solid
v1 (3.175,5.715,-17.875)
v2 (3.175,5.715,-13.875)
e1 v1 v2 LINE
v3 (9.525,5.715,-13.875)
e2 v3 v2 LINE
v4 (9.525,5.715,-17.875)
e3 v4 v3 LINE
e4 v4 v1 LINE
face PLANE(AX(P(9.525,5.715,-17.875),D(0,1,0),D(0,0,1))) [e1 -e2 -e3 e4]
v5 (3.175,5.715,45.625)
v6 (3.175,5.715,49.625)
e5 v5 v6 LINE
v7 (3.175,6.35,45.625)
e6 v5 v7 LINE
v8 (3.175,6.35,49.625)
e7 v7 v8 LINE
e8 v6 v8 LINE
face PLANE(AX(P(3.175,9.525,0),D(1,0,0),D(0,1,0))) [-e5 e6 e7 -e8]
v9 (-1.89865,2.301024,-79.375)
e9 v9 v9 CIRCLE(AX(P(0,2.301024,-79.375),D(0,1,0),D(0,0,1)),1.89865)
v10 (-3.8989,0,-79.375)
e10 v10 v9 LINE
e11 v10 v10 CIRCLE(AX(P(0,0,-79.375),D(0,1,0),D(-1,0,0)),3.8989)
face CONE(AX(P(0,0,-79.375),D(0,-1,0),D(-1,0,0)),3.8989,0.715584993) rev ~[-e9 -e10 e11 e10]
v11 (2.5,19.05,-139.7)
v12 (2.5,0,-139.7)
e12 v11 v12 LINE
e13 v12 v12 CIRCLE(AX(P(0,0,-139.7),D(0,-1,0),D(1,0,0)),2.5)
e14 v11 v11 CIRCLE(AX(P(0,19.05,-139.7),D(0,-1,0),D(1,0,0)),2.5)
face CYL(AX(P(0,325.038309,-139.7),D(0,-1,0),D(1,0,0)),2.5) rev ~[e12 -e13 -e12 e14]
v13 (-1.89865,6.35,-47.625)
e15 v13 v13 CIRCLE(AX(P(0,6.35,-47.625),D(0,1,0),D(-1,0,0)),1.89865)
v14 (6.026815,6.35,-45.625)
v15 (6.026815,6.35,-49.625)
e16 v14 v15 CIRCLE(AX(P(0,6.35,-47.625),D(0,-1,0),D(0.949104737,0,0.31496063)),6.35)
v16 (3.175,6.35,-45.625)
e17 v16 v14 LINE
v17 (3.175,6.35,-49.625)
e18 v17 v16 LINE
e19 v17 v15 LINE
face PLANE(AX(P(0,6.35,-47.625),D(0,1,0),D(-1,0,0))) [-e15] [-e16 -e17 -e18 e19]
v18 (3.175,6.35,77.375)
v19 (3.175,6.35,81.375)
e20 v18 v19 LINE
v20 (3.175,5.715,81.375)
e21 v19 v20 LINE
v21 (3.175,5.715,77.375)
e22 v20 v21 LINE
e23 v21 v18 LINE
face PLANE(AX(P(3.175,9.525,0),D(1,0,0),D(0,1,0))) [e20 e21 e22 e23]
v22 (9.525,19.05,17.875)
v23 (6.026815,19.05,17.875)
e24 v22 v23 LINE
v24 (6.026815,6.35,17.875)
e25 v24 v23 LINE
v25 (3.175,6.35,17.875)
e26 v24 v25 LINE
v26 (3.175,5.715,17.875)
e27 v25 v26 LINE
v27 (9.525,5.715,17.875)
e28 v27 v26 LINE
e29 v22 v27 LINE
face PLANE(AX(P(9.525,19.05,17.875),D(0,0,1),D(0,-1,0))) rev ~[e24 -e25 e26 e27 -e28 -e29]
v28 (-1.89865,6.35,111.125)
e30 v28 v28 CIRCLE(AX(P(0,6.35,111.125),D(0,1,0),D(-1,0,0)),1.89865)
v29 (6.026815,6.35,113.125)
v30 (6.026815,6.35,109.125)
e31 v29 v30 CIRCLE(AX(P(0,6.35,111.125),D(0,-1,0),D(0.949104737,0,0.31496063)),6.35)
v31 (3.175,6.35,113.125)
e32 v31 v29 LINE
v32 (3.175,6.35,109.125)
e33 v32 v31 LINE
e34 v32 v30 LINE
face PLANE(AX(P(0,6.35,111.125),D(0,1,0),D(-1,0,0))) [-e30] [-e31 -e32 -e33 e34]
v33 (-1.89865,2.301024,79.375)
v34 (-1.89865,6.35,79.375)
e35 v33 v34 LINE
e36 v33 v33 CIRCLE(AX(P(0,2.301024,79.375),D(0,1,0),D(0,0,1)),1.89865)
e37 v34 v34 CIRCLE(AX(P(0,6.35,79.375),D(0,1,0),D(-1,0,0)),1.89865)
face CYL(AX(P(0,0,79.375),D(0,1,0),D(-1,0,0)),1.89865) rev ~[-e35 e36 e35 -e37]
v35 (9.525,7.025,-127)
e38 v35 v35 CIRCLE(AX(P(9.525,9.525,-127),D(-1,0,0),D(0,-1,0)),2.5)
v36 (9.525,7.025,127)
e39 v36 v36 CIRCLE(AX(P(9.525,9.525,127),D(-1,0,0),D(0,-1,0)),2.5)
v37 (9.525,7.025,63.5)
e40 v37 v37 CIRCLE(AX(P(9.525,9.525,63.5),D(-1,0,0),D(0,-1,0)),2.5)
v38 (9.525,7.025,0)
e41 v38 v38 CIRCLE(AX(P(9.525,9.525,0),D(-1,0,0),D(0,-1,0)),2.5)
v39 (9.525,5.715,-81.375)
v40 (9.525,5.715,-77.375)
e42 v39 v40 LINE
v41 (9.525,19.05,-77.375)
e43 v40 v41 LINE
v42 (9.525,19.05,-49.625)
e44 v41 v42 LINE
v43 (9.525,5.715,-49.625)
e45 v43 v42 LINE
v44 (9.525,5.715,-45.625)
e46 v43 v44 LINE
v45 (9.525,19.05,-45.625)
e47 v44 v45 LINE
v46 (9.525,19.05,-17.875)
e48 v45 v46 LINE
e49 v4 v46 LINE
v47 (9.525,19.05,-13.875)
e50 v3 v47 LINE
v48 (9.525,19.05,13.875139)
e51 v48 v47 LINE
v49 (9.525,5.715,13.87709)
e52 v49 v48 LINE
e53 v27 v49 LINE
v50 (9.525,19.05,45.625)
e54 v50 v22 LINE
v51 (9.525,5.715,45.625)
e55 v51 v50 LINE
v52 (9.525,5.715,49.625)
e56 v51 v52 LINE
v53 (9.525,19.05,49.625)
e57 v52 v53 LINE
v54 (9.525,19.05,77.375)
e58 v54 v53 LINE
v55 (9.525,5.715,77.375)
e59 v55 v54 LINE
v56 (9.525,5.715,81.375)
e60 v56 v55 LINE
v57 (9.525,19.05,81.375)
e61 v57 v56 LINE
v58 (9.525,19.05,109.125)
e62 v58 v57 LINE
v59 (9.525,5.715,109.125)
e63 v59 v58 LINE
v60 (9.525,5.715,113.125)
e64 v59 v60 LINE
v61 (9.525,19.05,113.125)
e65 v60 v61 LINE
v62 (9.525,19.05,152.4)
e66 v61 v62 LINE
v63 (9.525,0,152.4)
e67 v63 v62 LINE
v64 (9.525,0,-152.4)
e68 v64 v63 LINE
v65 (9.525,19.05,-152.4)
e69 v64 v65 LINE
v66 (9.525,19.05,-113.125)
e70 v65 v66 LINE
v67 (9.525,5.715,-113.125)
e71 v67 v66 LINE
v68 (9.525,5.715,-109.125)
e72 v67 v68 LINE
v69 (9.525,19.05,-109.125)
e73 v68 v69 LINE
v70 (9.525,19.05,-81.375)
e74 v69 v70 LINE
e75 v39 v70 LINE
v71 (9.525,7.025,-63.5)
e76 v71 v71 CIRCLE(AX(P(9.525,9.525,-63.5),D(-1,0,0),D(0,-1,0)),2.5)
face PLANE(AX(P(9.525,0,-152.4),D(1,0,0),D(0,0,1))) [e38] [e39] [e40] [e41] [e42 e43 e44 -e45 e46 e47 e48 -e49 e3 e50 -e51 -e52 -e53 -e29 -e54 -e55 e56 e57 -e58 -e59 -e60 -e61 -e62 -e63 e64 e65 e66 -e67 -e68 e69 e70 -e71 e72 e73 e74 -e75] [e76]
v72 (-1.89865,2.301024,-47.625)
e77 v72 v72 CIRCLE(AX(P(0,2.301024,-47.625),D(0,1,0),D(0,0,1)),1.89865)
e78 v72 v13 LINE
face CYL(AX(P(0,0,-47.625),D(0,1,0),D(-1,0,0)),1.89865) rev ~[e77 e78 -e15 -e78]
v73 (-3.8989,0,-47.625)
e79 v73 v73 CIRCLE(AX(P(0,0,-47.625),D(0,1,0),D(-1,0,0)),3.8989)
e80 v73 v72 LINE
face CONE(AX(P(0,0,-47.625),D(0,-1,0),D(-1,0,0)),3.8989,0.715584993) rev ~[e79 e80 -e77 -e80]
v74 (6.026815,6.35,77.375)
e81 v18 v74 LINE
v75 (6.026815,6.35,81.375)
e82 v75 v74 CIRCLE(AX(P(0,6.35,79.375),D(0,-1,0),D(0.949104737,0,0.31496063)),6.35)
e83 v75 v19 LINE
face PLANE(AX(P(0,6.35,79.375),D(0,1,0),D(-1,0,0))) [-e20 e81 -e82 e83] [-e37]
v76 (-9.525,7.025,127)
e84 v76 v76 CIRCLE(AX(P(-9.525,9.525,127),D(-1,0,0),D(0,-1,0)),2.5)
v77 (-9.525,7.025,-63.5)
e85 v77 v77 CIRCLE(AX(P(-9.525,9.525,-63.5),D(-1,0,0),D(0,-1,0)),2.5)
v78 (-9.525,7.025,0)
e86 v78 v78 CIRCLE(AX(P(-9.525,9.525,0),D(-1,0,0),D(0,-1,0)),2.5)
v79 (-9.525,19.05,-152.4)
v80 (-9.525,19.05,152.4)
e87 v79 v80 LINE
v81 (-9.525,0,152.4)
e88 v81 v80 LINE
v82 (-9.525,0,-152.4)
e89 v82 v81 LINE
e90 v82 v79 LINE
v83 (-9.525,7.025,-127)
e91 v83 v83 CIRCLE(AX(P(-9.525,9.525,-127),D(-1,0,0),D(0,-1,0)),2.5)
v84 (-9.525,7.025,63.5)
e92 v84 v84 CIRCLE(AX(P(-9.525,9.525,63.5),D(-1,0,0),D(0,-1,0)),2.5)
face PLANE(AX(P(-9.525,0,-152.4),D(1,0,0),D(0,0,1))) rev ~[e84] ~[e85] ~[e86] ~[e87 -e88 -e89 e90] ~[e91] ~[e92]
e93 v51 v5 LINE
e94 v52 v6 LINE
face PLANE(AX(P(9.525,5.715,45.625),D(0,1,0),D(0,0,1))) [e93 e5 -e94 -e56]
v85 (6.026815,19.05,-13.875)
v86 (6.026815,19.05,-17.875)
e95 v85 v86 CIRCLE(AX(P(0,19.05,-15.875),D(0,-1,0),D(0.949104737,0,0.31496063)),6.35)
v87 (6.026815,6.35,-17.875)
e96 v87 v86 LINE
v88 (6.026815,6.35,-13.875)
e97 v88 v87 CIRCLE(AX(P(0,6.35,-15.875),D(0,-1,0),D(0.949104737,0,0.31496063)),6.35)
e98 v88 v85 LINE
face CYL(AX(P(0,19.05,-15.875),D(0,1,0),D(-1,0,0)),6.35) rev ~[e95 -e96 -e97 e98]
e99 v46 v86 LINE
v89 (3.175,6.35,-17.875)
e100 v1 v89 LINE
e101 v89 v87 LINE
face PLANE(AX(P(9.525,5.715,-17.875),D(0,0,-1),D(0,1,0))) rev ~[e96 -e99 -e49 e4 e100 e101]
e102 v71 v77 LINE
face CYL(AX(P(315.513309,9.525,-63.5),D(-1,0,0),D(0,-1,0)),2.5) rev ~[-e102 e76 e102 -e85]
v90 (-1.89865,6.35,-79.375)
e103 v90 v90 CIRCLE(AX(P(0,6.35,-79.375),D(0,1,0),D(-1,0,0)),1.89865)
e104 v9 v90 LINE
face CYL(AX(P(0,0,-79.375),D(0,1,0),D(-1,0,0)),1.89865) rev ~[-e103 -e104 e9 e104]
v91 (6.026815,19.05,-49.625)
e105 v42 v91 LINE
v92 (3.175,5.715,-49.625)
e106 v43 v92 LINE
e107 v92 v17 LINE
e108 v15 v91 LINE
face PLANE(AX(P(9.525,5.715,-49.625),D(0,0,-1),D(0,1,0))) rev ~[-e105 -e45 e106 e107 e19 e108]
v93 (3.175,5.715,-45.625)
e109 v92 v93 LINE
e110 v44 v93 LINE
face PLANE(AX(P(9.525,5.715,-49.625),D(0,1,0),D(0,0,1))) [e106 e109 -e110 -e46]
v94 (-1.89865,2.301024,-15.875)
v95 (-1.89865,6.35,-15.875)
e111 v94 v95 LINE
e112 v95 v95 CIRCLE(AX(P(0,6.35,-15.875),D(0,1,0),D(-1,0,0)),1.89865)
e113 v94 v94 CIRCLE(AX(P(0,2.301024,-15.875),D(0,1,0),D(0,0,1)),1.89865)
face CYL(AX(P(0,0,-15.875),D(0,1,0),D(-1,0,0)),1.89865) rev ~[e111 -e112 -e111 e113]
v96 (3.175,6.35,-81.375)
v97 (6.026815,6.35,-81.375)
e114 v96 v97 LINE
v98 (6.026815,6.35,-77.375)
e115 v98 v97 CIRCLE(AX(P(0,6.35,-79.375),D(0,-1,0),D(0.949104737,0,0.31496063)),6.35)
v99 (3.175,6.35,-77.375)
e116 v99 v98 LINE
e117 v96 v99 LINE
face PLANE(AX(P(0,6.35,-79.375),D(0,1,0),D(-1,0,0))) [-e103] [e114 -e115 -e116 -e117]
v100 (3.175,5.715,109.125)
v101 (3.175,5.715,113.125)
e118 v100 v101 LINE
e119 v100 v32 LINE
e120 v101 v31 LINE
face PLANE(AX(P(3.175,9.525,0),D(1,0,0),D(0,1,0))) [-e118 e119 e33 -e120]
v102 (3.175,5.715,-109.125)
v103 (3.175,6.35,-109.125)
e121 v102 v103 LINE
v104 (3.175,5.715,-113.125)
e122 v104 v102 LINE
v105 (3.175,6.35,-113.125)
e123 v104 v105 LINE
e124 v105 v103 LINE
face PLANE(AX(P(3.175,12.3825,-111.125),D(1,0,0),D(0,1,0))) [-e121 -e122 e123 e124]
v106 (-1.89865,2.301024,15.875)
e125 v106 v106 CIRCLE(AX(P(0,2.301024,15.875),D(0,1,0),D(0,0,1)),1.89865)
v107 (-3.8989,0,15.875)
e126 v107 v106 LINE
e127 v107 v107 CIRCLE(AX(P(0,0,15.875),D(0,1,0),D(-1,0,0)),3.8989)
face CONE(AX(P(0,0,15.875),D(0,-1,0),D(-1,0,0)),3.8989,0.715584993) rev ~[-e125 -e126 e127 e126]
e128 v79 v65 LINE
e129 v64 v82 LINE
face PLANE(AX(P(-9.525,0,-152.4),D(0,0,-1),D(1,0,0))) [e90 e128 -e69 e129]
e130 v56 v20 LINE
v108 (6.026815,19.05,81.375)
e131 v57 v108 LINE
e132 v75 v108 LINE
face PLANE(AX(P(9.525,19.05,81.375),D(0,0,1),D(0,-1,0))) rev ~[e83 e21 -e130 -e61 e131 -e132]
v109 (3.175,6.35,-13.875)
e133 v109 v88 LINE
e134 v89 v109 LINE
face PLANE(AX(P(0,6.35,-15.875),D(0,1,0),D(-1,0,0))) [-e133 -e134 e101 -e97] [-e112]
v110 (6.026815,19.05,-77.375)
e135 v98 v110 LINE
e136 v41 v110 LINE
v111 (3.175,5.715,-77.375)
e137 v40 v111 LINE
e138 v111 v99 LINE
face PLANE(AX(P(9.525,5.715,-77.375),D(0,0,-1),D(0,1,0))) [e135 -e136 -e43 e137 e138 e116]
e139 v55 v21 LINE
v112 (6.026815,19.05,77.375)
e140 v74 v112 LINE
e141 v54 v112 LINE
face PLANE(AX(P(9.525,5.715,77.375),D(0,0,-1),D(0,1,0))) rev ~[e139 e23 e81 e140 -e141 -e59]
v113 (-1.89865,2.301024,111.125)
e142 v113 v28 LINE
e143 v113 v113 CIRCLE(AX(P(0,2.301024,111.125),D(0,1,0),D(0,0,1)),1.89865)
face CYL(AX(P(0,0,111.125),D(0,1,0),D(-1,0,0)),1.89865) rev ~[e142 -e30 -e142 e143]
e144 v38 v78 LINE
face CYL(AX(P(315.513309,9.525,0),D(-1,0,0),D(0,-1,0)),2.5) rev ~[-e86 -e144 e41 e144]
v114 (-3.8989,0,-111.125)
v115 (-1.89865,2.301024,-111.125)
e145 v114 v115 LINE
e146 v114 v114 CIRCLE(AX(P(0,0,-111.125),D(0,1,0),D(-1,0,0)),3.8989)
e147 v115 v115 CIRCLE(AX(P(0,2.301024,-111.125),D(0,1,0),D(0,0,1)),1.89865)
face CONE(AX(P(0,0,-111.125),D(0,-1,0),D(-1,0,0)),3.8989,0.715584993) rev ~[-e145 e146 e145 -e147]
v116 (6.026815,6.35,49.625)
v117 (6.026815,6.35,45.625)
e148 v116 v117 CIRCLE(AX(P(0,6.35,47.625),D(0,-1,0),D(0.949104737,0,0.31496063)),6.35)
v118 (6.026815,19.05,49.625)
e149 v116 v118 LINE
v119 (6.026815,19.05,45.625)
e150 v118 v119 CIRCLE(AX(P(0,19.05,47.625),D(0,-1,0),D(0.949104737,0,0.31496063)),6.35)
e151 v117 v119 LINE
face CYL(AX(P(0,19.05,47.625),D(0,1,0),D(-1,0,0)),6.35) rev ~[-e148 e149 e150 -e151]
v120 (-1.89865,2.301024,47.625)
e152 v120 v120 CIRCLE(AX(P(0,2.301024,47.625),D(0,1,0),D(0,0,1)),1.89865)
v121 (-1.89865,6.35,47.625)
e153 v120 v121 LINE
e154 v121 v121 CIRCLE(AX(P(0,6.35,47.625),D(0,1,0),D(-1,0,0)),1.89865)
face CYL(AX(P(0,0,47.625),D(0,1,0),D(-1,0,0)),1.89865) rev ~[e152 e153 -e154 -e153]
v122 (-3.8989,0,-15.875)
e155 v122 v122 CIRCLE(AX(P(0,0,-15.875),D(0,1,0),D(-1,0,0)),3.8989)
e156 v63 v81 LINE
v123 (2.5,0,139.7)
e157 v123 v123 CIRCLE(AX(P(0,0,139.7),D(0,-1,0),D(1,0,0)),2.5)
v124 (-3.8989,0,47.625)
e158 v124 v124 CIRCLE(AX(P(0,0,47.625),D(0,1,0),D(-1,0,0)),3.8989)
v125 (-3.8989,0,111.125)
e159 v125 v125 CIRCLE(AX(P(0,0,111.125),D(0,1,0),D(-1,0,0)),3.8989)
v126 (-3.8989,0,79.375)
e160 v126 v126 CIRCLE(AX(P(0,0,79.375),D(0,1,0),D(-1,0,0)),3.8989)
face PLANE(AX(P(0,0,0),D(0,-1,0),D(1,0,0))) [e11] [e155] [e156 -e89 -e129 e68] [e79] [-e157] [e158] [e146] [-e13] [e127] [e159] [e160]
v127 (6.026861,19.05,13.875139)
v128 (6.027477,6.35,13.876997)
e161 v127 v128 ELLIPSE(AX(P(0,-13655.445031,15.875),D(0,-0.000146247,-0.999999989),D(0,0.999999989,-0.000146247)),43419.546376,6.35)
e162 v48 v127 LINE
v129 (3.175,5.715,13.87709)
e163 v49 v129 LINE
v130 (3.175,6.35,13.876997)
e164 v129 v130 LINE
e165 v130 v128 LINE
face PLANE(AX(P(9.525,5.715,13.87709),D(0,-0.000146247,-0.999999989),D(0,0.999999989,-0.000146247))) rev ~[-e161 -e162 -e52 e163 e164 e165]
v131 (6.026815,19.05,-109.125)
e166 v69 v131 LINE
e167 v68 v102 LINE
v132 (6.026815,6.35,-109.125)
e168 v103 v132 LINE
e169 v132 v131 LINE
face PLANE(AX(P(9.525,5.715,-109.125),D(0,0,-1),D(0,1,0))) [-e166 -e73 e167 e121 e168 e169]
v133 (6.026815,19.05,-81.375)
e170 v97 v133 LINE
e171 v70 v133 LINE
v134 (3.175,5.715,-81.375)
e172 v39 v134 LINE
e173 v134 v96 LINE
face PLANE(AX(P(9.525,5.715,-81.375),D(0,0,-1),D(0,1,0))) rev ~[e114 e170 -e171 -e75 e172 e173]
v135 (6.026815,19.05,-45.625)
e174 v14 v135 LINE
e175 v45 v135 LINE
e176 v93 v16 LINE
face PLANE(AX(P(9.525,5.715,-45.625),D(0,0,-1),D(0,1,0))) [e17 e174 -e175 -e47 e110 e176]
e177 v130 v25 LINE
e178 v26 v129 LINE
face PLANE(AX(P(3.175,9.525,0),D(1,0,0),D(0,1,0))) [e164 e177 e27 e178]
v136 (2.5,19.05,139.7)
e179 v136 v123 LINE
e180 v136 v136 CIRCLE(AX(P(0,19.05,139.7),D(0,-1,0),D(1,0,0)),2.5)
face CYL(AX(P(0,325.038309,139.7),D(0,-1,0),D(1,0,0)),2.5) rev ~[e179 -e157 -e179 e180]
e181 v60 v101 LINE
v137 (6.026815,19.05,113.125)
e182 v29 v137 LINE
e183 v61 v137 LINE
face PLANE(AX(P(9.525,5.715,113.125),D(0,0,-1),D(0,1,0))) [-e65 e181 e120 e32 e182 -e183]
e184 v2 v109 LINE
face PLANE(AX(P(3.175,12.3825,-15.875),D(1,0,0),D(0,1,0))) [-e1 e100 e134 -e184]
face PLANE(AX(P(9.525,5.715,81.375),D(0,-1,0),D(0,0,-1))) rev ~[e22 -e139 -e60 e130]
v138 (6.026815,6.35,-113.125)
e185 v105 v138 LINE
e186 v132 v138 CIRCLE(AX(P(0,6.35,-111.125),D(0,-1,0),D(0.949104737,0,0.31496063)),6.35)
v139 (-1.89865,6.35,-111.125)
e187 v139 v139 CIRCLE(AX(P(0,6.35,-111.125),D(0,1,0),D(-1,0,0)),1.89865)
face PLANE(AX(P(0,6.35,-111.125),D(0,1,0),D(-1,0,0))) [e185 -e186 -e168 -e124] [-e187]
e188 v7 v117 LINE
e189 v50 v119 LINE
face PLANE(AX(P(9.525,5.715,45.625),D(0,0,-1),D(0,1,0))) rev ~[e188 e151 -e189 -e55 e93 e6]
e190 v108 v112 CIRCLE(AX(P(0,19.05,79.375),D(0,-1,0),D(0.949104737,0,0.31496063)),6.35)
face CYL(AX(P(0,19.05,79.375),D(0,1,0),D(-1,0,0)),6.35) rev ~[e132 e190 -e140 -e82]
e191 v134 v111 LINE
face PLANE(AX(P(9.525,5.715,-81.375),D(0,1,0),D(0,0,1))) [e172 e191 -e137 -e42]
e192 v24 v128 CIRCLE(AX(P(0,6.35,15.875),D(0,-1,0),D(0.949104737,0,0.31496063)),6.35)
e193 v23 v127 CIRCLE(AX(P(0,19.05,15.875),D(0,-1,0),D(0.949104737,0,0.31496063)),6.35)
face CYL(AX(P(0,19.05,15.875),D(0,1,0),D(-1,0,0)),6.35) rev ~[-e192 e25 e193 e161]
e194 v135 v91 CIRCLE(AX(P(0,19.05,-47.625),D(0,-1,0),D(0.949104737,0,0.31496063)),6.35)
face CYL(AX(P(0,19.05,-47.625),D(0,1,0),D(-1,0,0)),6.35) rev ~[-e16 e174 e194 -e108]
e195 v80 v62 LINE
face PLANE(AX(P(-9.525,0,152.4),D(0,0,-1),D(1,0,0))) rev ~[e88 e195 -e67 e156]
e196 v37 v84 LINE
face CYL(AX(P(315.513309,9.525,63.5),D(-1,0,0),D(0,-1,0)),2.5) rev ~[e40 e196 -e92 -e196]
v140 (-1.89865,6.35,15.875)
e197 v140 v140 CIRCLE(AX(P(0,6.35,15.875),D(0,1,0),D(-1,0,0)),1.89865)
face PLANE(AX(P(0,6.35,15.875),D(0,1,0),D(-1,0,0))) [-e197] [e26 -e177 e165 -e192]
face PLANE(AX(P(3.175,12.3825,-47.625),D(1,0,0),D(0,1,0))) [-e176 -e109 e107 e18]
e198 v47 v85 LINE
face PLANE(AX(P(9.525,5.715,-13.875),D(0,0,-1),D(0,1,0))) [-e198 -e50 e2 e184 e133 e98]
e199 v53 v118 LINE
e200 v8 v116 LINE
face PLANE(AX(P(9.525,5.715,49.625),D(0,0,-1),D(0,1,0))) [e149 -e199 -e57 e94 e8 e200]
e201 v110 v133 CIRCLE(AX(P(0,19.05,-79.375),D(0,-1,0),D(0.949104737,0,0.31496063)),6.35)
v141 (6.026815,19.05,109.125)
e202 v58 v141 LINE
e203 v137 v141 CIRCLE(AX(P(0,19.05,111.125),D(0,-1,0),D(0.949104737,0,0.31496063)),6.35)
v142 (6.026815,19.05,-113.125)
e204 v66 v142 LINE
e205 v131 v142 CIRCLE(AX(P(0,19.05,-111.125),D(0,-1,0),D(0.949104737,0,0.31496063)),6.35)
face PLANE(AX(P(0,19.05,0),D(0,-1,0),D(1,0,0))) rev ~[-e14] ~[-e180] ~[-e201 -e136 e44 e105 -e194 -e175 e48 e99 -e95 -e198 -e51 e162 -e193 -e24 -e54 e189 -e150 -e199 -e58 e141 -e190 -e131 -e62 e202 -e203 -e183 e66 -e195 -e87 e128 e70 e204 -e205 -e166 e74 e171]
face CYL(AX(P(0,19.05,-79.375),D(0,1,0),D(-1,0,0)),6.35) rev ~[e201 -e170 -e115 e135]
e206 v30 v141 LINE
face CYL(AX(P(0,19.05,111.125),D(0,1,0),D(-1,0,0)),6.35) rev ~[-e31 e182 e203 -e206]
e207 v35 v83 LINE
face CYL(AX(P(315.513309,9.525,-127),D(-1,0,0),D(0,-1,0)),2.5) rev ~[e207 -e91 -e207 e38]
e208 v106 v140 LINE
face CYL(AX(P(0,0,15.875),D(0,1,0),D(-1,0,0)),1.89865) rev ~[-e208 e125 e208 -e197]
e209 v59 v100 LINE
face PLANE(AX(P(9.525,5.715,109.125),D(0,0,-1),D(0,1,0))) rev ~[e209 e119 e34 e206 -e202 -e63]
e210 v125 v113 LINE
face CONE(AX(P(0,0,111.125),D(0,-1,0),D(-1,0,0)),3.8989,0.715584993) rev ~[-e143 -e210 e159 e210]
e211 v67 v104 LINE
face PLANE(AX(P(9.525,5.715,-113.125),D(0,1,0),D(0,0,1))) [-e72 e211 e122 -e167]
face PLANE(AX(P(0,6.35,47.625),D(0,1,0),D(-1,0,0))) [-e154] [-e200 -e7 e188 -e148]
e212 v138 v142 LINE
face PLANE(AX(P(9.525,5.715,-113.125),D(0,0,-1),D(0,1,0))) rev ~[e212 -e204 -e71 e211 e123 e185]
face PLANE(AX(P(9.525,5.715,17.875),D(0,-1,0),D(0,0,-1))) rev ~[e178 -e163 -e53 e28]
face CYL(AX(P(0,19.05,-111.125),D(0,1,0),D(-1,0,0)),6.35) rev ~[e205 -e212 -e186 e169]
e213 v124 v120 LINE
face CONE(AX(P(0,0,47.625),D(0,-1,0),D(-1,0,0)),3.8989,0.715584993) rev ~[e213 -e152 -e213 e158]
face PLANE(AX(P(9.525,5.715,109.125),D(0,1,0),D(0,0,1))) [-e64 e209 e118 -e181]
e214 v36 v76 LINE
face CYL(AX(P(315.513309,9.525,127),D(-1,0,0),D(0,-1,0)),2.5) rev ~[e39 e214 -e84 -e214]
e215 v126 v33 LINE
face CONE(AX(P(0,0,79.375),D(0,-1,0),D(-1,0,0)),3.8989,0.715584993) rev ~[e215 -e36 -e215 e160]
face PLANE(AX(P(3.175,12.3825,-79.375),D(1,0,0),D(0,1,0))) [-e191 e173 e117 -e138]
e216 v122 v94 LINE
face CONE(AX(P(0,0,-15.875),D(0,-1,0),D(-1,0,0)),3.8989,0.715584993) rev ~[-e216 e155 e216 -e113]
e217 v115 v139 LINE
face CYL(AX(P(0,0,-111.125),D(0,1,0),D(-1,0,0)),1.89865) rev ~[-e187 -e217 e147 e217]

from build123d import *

# Parameters (mm, degrees)
F0_W           = 19.05
F0_H           = 304.8
F1_DEPTH       = 19.05
F3_D           = 5
F5_D           = 3.7973
F5_DEPTH       = 12.7
F5_CSINK_D     = 7.7978
F5_CSINK_ANGLE = 82
F5_TIP         = 1.1408240143
F6_W           = 31.75
F6_H           = 317.5
F6_W_2         = 23.05
F6_H_2         = 308.8
F6_W_3         = 13.335
F6_H_3         = 4
F6_W_4         = 0.9525
F7_DEPTH       = 6.35
F4_R           = 6.35
F8_DEPTH       = 12.7
F10_D          = 5


with BuildPart() as f1:
    # F0 (on Front) → F1 (new body)
    with BuildSketch(Plane.XZ):
        Rectangle(F0_W, F0_H)
    extrude(amount=-F1_DEPTH)

    # F3 (through all)
    with Locations(Plane.YZ.offset(9.525)):
        with Locations((9.525, 127), (9.525, 63.5), (9.525, 0), (9.525, -63.5), (9.525, -127)):
            Hole(F3_D / 2)

    # F5
    with Locations(Plane.XZ):
        with Locations((0, 111.125), (0, 79.375), (0, 47.625), (0, 15.875), (0, -15.875), (0, -47.625), (0, -79.375), (0, -111.125)):
            CounterSinkHole(F5_D / 2, F5_CSINK_D / 2, depth=F5_DEPTH, counter_sink_angle=F5_CSINK_ANGLE)
            with Locations((0, 0, -(F5_DEPTH + F5_TIP / 2))):  # 118° drill point
                Cone(0, F5_D / 2, F5_TIP, mode=Mode.SUBTRACT)

    # F6 (on face) → F7 (cut)
    with BuildSketch(Plane.YZ.offset(9.525)):
        with Locations((9.525, 0)):
            Rectangle(F6_W, F6_H)
        with Locations((9.525, 0)):
            Rectangle(F6_W_2, F6_H_2, mode=Mode.SUBTRACT)
        with Locations((9.525, 0)):
            Rectangle(F6_W_2, F6_H_2)
        Polygon((20.0025, 13.875), (19.05, 13.875), (19.05, -13.875), (20.0025, -13.875), (20.0025, -17.875), (19.05, -17.875), (19.05, -45.625), (20.0025, -45.625), (20.0025, -49.625), (19.05, -49.625), (19.05, -77.375), (20.0025, -77.375), (20.0025, -81.375), (19.05, -81.375), (19.05, -109.125), (20.0025, -109.125), (20.0025, -113.125), (19.05, -113.125), (19.05, -152.4), (0, -152.4), (0, 152.4), (19.05, 152.4), (19.05, 113.125), (20.0025, 113.125), (20.0025, 109.125), (19.05, 109.125), (19.05, 81.375), (20.0025, 81.375), (20.0025, 77.375), (19.05, 77.375), (19.05, 49.625), (20.0025, 49.625), (20.0025, 45.625), (19.05, 45.625), (19.05, 17.875), (20.0025, 17.875), align=None, mode=Mode.SUBTRACT)
        with Locations((12.3825, -15.875)):
            Rectangle(F6_W_3, F6_H_3)
        with Locations((12.3825, 47.625)):
            Rectangle(F6_W_3, F6_H_3)
        with Locations((12.3825, -47.625)):
            Rectangle(F6_W_3, F6_H_3)
        Polygon((5.715, 77.375), (19.05, 77.375), (19.05, 77.3812195068), (19.05, 81.375), (5.715, 81.375), align=None)
        with Locations((12.3825, -79.375)):
            Rectangle(F6_W_3, F6_H_3)
        with Locations((12.3825, -111.125)):
            Rectangle(F6_W_3, F6_H_3)
        with Locations((12.3825, 111.125)):
            Rectangle(F6_W_3, F6_H_3)
        Polygon((5.715, 17.875), (5.715, 13.8770895111), (19.05, 13.8751393007), (19.05, 17.875), align=None)
        with Locations((19.52625, 47.625)):
            Rectangle(F6_W_4, F6_H_3)
        with Locations((19.52625, 111.125)):
            Rectangle(F6_W_4, F6_H_3)
        Polygon((19.05, 17.875), (19.05, 13.8751393007), (20.0025, 13.875), (20.0025, 17.875), align=None)
        Polygon((19.05, 77.3812195068), (20.0025, 77.375), (20.0025, 81.375), (19.05, 81.375), align=None)
    extrude(amount=-F7_DEPTH, mode=Mode.SUBTRACT)

    # F4 (on face) → F8 (cut)
    with BuildSketch(Plane(origin=(0, 19.05, 0), x_dir=(-1, 0, 0), z_dir=(0, 1, 0))):
        with Locations((0, 111.125)):
            Circle(F4_R)
        with Locations((0, 79.375)):
            Circle(F4_R)
        with Locations((0, 47.625)):
            Circle(F4_R)
        with Locations((0, 15.875)):
            Circle(F4_R)
        with Locations((0, -47.625)):
            Circle(F4_R)
        with Locations((0, -79.375)):
            Circle(F4_R)
        with Locations((0, -111.125)):
            Circle(F4_R)
        with Locations((0, -15.875)):
            Circle(F4_R)
    extrude(amount=-F8_DEPTH, mode=Mode.SUBTRACT)

    # F10 (through all)
    with Locations(Plane(origin=(0, 19.05, 0), x_dir=(-1, 0, 0), z_dir=(0, 1, 0))):
        with Locations((0, 139.7), (0, -139.7)):
            Hole(F10_D / 2)


solid = f1.part
